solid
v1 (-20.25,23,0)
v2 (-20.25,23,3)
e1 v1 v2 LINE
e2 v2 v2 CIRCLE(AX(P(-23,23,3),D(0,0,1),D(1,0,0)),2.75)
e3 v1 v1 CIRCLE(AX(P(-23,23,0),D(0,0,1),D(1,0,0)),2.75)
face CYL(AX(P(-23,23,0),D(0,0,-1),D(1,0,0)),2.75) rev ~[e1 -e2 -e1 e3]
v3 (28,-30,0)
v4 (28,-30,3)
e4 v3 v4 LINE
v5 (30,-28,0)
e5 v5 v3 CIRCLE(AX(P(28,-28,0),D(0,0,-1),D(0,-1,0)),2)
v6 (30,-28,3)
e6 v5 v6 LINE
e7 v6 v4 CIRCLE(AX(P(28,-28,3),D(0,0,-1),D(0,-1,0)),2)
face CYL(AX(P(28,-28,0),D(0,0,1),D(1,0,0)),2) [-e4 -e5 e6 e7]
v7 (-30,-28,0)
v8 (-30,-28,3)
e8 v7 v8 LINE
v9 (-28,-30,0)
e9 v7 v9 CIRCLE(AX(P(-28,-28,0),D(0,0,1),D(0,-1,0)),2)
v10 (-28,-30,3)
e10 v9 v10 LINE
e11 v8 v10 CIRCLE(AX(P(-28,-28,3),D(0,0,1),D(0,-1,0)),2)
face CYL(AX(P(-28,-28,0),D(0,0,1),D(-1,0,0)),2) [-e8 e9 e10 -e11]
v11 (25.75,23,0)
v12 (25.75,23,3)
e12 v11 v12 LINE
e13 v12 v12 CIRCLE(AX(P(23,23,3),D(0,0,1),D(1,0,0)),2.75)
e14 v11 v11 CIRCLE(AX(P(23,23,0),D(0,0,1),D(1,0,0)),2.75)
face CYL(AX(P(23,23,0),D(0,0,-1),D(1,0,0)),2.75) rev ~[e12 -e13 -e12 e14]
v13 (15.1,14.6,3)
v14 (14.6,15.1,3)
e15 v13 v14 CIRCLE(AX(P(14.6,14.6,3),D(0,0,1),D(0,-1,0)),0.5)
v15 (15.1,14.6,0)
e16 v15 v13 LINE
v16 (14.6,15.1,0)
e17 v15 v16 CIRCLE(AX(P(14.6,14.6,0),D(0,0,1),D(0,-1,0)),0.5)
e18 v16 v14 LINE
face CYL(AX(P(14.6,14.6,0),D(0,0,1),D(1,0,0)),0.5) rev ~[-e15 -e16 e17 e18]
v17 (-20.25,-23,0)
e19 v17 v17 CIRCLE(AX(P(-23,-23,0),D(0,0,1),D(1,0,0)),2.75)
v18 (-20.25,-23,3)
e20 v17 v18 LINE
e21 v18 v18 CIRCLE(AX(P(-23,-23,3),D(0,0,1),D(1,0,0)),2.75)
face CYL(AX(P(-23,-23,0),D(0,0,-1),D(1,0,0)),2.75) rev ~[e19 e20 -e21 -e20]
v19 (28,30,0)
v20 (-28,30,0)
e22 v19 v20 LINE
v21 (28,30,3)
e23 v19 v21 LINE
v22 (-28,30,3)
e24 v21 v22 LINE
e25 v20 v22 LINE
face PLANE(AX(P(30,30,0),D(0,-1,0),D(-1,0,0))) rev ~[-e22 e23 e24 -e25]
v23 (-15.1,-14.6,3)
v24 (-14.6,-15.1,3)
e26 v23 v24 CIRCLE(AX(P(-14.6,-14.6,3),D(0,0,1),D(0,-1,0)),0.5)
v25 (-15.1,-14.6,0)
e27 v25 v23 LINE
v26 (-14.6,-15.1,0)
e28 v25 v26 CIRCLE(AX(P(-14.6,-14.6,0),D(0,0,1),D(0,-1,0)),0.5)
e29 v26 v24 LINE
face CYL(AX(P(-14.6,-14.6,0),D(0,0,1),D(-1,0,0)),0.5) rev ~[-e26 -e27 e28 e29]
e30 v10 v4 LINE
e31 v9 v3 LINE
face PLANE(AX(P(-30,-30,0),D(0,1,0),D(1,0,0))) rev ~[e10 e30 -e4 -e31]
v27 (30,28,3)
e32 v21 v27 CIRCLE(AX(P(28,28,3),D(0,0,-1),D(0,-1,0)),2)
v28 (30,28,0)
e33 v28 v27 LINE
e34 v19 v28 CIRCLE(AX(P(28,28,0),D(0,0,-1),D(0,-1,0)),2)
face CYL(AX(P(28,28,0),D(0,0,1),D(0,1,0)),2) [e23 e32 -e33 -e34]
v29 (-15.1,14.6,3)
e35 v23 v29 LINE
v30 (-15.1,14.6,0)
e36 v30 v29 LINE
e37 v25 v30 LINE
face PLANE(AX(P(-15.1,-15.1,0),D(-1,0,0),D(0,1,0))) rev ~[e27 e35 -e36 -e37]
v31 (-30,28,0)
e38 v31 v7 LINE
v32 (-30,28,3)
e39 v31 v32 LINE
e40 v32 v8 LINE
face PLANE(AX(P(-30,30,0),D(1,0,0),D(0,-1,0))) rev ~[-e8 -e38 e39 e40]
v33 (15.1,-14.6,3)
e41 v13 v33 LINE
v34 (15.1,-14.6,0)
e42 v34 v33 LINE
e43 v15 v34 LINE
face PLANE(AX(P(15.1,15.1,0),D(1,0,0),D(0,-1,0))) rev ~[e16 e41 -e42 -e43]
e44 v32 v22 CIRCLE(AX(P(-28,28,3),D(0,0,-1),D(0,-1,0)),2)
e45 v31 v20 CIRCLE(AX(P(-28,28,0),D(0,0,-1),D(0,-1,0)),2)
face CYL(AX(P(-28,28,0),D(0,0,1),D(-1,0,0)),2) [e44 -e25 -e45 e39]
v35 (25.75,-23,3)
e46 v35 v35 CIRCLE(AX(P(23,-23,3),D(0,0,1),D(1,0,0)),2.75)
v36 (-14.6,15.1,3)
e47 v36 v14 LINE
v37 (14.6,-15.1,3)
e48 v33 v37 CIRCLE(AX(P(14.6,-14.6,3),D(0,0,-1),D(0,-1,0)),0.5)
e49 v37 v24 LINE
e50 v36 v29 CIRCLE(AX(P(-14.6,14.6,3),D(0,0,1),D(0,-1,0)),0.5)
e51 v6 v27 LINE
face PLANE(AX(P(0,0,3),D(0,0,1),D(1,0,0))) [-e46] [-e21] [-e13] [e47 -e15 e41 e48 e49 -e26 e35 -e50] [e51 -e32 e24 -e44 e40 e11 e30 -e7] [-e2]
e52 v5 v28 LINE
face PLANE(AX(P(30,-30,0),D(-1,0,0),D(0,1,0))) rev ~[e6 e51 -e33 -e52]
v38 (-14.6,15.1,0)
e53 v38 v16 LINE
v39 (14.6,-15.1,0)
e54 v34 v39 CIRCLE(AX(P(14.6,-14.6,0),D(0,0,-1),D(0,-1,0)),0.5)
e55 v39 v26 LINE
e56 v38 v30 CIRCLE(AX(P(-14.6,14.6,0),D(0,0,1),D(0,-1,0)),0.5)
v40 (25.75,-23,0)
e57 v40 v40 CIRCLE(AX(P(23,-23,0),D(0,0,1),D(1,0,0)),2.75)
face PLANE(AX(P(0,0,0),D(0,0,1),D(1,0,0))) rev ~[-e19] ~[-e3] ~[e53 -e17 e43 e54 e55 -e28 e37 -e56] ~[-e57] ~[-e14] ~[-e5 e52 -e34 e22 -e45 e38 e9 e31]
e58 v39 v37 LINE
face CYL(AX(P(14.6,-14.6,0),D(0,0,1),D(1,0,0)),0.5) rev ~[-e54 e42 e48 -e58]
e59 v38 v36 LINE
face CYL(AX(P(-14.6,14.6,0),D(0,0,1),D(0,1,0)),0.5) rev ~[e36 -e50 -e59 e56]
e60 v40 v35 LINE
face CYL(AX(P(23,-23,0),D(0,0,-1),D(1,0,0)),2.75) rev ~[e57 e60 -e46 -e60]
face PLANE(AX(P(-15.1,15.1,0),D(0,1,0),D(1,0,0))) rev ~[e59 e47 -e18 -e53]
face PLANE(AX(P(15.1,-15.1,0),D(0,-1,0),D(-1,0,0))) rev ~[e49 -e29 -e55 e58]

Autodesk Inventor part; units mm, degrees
ref_plane "YZ Plane" through (0, 0, 0) normal (1, 0, 0) x (0, 1, 0)
ref_plane "XZ Plane" through (0, 0, 0) normal (0, 1, 0) x (-1, 0, 0)
ref_plane "XY Plane" through (0, 0, 0) normal (0, 0, 1) x (1, 0, 0)
sketch "Sketch1" plane through (0, 0, 0) normal (0, 0, 1) x (1, 0, 0)
  line L0 (-30, -30) -> (30, -30)
  line L1 (30, -30) -> (30, 30)
  line L2 (30, 30) -> (-30, 30)
  line L3 (-30, 30) -> (-30, -30)
  line L4 (-30, -30) -> (30, 30) construction
  line L5 (30, -30) -> (-30, 30) construction
  line L6 (15.1, -15.1) -> (-15.1, -15.1)
  line L7 (-15.1, -15.1) -> (-15.1, 15.1)
  line L8 (-15.1, 15.1) -> (15.1, 15.1)
  line L9 (15.1, 15.1) -> (15.1, -15.1)
  line L10 (15.1, -15.1) -> (-15.1, 15.1) construction
  line L11 (-15.1, -15.1) -> (15.1, 15.1) construction
  circle A0 centre (-23, -23) radius 2.75
  circle A1 centre (23, -23) radius 2.75
  circle A2 centre (23, 23) radius 2.75
  circle A3 centre (-23, 23) radius 2.75
  line L12 (25.75, 25.75) -> (-25.75, 25.75) construction
  line L13 (-25.75, 25.75) -> (-25.75, -25.75) construction
  line L14 (-25.75, -25.75) -> (25.75, -25.75) construction
  line L15 (25.75, -25.75) -> (25.75, 25.75) construction
  line L16 (25.75, 25.75) -> (-25.75, -25.75) construction
  line L17 (-25.75, 25.75) -> (25.75, -25.75) construction
  line L18 (23, 23) -> (-23, 23) construction
  line L19 (-23, 23) -> (-23, -23) construction
  line L20 (-23, -23) -> (23, -23) construction
  line L21 (23, -23) -> (23, 23) construction
  line L22 (23, 23) -> (-23, -23) construction
  line L23 (-23, 23) -> (23, -23) construction
  point P0 (0, 0)
  dimension "d172" = 30.2
  dimension "d190" = 5.5
  dimension "d191" = 46
  dimension "d192" = 60
extrude "Plate5" add sketch "Sketch1" along normal blind 3
fillet "Corner Round1" radius 2 4 edges at (30, 30, 1.5) (-30, 30, 1.5) (-30, -30, 1.5) (30, -30, 1.5)
fillet "Corner Round2" radius 0.5 4 edges at (-15.1, 15.1, 1.5) (-15.1, -15.1, 1.5) (15.1, -15.1, 1.5) (15.1, 15.1, 1.5)
properties part number "PRS 1425 FDS Way FLANGE_940" material "Stainless Steel"
